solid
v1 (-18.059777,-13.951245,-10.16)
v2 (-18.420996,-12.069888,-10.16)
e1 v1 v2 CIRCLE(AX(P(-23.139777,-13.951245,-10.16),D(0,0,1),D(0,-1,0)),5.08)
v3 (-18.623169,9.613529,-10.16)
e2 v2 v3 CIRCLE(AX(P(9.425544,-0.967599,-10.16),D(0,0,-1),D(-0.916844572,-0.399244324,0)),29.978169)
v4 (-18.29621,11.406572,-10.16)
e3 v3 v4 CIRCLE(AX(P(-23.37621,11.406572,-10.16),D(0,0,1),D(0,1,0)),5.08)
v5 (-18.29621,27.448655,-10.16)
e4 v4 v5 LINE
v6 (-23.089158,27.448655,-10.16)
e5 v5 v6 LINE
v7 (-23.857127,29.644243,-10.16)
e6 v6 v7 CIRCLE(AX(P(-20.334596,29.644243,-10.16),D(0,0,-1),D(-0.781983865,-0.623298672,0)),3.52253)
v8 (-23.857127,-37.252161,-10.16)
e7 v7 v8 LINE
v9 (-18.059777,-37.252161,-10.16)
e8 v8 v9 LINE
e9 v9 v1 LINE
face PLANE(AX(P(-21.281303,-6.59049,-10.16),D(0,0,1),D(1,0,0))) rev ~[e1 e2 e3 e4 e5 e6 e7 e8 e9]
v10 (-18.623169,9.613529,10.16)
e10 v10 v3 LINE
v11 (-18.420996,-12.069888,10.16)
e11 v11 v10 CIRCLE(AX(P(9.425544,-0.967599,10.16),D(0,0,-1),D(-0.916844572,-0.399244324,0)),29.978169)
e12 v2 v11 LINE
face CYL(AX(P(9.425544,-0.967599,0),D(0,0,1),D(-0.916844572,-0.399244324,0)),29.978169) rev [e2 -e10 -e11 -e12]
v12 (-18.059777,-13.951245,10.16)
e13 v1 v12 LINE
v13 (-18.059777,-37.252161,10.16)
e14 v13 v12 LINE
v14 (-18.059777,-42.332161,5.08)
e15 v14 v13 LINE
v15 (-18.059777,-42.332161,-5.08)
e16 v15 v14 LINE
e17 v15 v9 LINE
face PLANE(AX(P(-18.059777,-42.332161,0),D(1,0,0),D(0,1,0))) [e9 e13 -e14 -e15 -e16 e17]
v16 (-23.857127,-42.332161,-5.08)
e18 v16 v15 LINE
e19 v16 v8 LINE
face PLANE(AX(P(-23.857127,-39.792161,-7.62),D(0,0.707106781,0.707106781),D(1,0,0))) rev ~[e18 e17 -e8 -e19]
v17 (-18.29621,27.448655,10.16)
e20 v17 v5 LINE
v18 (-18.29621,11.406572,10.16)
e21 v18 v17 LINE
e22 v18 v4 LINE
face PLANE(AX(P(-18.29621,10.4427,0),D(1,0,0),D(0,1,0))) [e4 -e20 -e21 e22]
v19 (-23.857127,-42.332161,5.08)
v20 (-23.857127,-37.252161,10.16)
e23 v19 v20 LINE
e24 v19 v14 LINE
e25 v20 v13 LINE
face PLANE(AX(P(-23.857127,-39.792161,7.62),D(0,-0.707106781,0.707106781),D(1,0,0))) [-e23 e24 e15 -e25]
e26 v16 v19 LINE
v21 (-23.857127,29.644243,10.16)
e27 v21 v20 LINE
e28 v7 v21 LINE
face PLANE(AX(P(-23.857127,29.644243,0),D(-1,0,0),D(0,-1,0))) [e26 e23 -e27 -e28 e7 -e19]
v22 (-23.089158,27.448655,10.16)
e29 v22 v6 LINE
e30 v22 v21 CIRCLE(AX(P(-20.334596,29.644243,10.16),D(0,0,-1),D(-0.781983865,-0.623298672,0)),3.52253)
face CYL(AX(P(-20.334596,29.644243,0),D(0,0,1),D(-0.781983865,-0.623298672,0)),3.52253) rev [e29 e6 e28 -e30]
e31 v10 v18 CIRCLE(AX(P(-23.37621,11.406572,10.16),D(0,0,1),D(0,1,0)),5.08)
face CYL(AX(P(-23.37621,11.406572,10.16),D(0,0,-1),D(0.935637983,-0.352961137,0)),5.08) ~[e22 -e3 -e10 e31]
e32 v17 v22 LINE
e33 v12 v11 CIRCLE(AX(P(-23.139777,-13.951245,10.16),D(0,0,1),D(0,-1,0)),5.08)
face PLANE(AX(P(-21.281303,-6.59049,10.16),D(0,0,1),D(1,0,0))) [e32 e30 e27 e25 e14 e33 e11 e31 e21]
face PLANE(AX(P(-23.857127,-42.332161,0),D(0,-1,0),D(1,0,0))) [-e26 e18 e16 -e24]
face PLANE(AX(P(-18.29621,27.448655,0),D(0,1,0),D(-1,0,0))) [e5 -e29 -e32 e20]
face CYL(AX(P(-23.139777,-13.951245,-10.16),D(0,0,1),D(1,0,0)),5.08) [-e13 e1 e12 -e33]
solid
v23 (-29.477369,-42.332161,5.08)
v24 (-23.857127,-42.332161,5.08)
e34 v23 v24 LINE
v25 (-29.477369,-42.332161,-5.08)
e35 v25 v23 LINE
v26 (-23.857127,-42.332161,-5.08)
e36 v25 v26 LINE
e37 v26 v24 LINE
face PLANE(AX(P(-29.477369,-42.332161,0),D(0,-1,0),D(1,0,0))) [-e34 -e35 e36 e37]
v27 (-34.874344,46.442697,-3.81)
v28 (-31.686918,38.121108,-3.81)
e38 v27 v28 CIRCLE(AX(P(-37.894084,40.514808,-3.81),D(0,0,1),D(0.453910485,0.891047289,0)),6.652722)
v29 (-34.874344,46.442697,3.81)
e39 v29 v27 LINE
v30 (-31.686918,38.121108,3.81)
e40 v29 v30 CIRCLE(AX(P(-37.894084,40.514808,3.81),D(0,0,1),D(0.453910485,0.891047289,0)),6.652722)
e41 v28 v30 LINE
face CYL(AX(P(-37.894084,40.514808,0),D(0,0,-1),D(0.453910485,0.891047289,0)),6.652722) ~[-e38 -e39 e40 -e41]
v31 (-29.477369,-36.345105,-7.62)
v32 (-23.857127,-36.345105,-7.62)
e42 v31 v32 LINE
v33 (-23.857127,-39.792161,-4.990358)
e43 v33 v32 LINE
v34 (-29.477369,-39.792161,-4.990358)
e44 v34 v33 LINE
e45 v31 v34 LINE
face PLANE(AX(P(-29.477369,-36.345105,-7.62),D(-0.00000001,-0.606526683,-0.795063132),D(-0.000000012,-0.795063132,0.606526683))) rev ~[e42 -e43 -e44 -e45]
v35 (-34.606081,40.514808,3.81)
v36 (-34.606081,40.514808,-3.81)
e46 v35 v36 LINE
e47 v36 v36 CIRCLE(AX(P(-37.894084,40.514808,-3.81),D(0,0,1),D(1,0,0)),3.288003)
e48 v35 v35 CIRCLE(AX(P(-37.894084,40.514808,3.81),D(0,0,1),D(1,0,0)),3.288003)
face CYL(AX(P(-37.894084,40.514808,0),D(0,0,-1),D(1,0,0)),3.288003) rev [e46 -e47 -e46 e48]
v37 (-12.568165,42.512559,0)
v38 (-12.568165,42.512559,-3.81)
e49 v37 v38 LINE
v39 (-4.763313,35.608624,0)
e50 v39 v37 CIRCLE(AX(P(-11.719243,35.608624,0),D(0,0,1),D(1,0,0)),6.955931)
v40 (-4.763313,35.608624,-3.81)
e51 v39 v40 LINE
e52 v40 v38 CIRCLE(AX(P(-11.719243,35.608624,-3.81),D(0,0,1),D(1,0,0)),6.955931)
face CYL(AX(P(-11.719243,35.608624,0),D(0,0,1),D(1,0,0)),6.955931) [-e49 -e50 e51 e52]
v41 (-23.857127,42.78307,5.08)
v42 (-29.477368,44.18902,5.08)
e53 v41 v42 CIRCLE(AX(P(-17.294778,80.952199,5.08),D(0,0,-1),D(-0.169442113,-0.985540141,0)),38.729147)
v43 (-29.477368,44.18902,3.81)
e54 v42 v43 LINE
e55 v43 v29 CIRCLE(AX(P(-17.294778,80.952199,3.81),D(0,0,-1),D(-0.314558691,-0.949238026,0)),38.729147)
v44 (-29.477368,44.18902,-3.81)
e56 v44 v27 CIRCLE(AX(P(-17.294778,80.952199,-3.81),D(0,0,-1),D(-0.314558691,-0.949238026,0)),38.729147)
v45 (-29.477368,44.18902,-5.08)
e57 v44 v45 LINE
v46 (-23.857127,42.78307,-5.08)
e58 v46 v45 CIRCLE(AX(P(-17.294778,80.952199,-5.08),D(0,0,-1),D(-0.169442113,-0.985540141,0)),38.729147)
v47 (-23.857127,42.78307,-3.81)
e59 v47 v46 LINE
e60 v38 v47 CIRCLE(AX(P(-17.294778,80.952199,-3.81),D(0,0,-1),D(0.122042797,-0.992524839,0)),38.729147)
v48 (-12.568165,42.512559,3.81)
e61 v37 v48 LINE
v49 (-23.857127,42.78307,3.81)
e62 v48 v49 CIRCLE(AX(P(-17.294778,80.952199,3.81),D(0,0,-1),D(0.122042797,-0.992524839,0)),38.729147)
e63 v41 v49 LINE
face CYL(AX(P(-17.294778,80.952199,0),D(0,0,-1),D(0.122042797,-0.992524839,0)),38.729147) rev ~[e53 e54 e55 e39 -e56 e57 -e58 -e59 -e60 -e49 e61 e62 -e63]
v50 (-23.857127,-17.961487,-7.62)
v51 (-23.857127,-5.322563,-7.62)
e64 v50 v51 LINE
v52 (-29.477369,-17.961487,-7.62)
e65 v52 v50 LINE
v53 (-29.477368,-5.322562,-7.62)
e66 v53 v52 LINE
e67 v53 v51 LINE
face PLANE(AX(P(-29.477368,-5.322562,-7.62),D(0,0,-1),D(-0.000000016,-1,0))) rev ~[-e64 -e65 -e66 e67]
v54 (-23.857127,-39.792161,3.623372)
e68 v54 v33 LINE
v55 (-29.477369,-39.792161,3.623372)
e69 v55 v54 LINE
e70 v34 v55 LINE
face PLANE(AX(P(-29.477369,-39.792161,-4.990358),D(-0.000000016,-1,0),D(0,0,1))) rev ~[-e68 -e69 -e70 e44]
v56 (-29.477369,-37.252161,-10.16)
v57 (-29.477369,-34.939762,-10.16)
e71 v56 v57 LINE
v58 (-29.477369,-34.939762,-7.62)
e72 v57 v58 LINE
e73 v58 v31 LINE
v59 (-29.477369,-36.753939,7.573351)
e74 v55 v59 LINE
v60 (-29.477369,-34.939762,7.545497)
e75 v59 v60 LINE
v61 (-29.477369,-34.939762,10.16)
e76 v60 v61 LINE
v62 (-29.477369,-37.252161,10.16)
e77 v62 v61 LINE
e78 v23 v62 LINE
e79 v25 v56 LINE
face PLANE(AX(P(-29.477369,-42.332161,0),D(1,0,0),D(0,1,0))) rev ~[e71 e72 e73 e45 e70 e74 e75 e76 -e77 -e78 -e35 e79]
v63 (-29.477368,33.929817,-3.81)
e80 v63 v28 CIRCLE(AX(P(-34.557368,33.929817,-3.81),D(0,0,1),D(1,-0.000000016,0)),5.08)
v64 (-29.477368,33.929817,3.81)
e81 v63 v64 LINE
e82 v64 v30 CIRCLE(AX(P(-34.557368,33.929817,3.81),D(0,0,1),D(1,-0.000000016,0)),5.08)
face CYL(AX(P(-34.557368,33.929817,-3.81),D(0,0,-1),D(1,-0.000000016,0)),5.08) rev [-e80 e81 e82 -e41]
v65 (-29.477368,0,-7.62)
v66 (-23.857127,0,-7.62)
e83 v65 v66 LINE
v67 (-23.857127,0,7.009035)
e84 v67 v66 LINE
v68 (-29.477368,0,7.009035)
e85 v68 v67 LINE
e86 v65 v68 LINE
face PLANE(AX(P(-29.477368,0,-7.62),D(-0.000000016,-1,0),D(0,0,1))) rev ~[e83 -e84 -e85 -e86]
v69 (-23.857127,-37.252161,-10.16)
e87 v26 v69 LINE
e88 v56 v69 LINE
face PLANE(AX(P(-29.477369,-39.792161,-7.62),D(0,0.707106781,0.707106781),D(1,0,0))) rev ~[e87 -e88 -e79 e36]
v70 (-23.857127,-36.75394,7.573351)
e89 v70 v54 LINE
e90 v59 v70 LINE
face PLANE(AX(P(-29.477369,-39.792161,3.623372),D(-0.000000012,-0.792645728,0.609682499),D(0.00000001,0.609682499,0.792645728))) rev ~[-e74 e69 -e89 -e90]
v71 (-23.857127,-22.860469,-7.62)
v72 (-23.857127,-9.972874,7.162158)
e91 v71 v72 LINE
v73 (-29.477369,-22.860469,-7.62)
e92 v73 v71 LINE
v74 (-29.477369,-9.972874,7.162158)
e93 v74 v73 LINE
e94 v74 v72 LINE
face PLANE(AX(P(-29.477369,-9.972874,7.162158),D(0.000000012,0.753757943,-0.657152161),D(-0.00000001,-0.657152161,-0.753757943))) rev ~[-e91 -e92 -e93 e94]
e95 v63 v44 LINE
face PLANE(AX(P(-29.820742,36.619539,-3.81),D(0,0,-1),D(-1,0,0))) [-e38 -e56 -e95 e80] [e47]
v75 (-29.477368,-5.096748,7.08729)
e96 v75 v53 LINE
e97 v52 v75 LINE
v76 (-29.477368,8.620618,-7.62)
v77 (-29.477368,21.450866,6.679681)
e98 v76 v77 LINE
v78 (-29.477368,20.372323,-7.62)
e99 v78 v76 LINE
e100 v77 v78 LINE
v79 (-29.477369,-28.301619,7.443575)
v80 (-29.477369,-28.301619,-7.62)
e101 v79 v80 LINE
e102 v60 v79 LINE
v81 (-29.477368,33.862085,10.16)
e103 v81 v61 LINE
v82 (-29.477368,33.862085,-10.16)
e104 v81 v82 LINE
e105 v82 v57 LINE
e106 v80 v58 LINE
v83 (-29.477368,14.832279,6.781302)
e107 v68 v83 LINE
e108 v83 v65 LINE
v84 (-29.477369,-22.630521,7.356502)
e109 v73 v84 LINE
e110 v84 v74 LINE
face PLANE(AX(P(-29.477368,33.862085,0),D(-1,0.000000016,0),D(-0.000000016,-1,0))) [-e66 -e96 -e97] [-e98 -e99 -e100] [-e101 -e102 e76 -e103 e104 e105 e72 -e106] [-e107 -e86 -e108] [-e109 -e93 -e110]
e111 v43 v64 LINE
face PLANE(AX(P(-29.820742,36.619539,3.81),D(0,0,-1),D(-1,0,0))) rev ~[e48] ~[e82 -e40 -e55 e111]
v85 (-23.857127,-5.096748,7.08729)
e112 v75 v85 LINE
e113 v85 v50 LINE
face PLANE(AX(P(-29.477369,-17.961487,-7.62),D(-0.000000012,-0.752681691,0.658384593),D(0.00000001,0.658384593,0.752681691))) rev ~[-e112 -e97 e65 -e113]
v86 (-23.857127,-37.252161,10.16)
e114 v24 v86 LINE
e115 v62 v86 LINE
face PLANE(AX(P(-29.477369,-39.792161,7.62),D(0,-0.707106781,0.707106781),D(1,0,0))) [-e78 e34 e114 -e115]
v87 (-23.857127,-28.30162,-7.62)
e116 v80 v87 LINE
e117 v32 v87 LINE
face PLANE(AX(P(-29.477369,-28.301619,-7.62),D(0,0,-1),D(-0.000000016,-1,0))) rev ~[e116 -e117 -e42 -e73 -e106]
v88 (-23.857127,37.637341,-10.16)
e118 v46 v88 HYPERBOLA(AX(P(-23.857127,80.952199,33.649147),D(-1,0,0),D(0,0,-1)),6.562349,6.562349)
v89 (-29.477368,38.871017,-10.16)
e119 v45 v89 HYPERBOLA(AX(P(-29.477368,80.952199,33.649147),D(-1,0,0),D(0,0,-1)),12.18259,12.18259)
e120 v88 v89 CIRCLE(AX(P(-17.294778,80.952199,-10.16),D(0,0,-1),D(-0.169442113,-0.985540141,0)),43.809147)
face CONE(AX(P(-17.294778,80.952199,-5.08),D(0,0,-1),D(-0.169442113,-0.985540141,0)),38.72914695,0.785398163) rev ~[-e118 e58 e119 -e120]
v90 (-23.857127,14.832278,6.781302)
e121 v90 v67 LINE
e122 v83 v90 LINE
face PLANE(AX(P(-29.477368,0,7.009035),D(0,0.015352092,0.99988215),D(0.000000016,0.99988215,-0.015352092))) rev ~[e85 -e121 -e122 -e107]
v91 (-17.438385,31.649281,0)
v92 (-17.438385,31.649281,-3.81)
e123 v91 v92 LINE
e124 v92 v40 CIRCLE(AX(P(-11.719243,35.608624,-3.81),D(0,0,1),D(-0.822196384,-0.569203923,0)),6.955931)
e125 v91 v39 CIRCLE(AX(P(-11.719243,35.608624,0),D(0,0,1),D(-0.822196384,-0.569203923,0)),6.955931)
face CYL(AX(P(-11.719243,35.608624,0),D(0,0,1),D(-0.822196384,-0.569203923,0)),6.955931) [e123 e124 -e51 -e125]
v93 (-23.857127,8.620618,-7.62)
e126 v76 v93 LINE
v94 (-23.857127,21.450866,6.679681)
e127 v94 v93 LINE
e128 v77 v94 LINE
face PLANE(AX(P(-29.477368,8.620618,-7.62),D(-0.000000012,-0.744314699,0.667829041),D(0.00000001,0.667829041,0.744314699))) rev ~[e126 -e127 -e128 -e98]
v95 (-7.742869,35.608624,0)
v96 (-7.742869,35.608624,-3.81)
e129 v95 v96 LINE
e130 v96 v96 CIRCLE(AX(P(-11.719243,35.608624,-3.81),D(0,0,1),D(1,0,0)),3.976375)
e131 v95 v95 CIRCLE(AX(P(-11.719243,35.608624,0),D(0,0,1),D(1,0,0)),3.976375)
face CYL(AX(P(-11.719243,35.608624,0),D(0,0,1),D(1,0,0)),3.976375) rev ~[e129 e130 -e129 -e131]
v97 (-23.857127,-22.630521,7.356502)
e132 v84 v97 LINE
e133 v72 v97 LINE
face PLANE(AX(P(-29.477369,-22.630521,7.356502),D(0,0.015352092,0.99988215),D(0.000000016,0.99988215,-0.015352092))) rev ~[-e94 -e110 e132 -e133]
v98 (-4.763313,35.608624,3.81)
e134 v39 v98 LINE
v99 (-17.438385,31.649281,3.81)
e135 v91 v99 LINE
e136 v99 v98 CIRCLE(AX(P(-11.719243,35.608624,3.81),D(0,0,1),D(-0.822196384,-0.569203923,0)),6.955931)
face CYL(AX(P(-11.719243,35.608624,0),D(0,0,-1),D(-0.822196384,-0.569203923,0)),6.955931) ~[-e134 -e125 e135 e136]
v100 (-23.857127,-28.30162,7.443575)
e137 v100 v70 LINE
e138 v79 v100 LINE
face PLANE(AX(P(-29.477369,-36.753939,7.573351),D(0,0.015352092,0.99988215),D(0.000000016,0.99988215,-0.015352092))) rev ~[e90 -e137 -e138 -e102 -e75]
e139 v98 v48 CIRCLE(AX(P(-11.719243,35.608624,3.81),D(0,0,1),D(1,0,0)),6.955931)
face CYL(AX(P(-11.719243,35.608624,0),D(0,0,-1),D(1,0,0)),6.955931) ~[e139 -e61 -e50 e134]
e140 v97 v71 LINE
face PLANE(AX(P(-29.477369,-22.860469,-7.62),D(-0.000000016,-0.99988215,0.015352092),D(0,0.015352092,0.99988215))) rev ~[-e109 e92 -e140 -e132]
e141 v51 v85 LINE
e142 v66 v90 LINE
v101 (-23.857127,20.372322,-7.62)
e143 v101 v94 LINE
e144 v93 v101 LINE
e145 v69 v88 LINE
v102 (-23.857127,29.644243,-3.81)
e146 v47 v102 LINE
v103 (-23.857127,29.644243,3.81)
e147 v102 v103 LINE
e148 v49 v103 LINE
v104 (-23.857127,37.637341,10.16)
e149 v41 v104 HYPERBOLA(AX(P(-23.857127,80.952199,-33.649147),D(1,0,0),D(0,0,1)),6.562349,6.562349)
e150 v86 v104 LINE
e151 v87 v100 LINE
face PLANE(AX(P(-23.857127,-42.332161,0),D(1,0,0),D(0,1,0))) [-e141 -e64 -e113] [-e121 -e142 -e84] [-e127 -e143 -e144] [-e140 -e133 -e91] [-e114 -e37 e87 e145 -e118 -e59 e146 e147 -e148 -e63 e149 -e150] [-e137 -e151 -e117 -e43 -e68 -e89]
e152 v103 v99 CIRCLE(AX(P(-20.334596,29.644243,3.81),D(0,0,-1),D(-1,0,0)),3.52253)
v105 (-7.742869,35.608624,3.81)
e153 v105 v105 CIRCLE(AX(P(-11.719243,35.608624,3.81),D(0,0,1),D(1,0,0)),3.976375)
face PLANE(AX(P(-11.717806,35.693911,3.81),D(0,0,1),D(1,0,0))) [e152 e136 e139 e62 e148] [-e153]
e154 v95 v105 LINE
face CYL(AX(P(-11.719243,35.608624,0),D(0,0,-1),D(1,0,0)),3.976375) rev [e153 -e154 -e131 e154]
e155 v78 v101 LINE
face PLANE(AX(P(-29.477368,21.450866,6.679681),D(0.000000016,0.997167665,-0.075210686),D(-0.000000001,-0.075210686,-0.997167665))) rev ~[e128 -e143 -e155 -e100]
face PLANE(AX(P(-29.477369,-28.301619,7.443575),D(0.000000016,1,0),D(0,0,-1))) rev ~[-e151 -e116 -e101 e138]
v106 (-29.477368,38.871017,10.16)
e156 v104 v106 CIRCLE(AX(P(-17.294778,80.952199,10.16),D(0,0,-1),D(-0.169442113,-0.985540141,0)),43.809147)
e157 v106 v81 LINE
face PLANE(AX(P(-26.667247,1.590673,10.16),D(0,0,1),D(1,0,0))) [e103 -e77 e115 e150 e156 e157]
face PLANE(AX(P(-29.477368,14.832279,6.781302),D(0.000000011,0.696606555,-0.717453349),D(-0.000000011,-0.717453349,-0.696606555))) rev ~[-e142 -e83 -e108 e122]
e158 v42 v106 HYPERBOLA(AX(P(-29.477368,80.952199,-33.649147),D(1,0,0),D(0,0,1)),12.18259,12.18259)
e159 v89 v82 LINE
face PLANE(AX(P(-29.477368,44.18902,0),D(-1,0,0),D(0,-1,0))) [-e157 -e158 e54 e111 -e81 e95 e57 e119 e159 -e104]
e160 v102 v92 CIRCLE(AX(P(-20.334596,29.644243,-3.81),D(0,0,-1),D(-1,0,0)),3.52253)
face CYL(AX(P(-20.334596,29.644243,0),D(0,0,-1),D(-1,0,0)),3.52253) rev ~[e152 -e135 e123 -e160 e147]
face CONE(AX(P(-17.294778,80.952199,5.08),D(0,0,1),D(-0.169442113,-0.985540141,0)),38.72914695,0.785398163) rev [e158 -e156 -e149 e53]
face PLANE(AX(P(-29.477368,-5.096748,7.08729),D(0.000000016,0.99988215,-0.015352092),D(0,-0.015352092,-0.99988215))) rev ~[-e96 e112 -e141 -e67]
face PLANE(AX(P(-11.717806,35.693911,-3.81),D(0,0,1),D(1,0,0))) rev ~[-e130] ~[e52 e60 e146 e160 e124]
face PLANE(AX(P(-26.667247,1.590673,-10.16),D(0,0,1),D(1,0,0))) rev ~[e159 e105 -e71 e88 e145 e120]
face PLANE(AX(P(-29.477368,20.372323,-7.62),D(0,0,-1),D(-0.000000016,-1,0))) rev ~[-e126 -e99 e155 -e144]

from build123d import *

# Parameters (mm, degrees)
F0_W        = 5.6202424753
F0_H        = 7.3923990308
F1_DEPTH    = 10.16
F0_R        = 3.2880029728
F0_R_2      = 3.9763748147
F2_DEPTH    = 3.81
F3_SIZE     = 5.08
F4_DEPTH    = 10.16
F5_SIZE     = 5.08
F6_T1_DEPTH = 7.62
F6_2_F1_R   = 5.08
F6_2_F2_R   = 5.08
F8_DEPTH    = 12.7


# Not quite as in the source:
# - a fillet or chamfer that OpenCascade refuses, or shapes differently, is made with other operations: its cross-section is extruded or revolved along the edge and cut away or added


with BuildPart() as f1:
    # F0 (on Top) → F1 (new body, symmetric)
    with BuildSketch(Plane.XY):
        Polygon((-23.8571265649, 38.1211079657), (-29.4773678438, 38.1211079657), (-29.4773678438, 33.8620854561), (-29.4773689242, -34.9397621871), (-23.8571265649, -34.9397622754), (-23.8571265649, 29.6442432214), align=None)
        with BuildLine():
            ThreePointArc((-23.8571265649, 42.7830699379), (-26.6935732854, 43.3808072311), (-29.4773678438, 44.1890199055))
            Line((-29.4773678438, 44.1890199055), (-29.4773678438, 38.1211079657))
            Line((-29.4773678438, 38.1211079657), (-23.8571265649, 38.1211079657))
            Line((-23.8571265649, 38.1211079657), (-23.8571265649, 42.7830699379))
        make_face()
        with Locations((-26.6672478026, -38.6359617025)):
            Rectangle(F0_W, F0_H)
    extrude(amount=F1_DEPTH, both=True)

    # F0 (on Top) → F2 (join, symmetric)
    with BuildSketch(Plane.XY):
        with BuildLine():
            ThreePointArc((-31.6869179481, 38.1211079657), (-31.3536995737, 39.297400699), (-31.2413621678, 40.5148075278))
            ThreePointArc((-31.2413621678, 40.5148075278), (-32.2218622797, 43.9910999495), (-34.8743439371, 46.4426974955))
            ThreePointArc((-34.8743439371, 46.4426974955), (-44.1066653776, 38.1351969368), (-31.6869179481, 38.1211079657))
        make_face()
        with Locations((-37.8940842395, 40.5148075278)):
            Circle(F0_R, mode=Mode.SUBTRACT)
        with BuildLine():
            ThreePointArc((-4.763312552, 35.6086244195), (-7.1105593997, 40.8187113422), (-12.5681646531, 42.5125585623))
            ThreePointArc((-12.5681646531, 42.5125585623), (-18.0664915689, 38.4542200705), (-17.4383845866, 31.6492812901))
            ThreePointArc((-17.4383845866, 31.6492812901), (-9.6452347995, 28.9690866137), (-4.763312552, 35.6086244195))
        make_face()
        with Locations((-11.7192433987, 35.6086244195)):
            Circle(F0_R_2, mode=Mode.SUBTRACT)
        with BuildLine():
            ThreePointArc((-12.5681646531, 42.5125585623), (-18.2225576344, 42.2341662967), (-23.8571265649, 42.7830699379))
            Line((-23.8571265649, 42.7830699379), (-23.8571265649, 38.1211079657))
            Line((-23.8571265649, 38.1211079657), (-23.8571265649, 29.6442432214))
            ThreePointArc((-23.8571265649, 29.6442432214), (-21.3848882076, 33.0065499535), (-17.4383845866, 31.6492812901))
            ThreePointArc((-17.4383845866, 31.6492812901), (-18.0664915689, 38.4542200705), (-12.5681646531, 42.5125585623))
        make_face()
        with BuildLine():
            ThreePointArc((-34.8743439371, 46.4426974955), (-32.2218622797, 43.9910999495), (-31.2413621678, 40.5148075278))
            ThreePointArc((-31.2413621678, 40.5148075278), (-31.3536995737, 39.297400699), (-31.6869179481, 38.1211079657))
            Line((-31.6869179481, 38.1211079657), (-29.4773678438, 38.1211079657))
            Line((-29.4773678438, 38.1211079657), (-29.4773678438, 44.1890199055))
            ThreePointArc((-29.4773678438, 44.1890199055), (-32.2184586739, 45.213836031), (-34.8743439371, 46.4426974955))
        make_face()
    extrude(amount=F2_DEPTH, both=True)

    # F3
    f3_edges = [f1.edges().sort_by_distance(p)[0] for p in [
        (-26.693573, 43.380807, 10.16),
        (-26.693573, 43.380807, -10.16),
        (-26.667248, -42.332161, 10.16),
        (-26.667248, -42.332161, -10.16),
    ]]
    chamfer(f3_edges, length=F3_SIZE)

    # F6: fillet of radius 5.08 on 4 edges, made by hand

    # F6_s2 → F6_t1 (join)
    with BuildSketch(Plane.XY.offset(-3.81)):
        with BuildLine():
            ThreePointArc((-29.4773678427, 33.9298172252), (-30.063578473, 36.2988375878), (-31.6869179481, 38.1211079657))
            Line((-31.6869179481, 38.1211079657), (-31.3998729586, 38.5402370318))
            ThreePointArc((-31.3998729586, 38.5402370318), (-30.5821428959, 38.6291079657), (-29.4773678438, 38.6291079657))
            Line((-29.4773678438, 38.6291079657), (-28.9693678438, 38.1211079657))
            Line((-28.9693678438, 38.1211079657), (-28.9693678427, 33.9298172173))
            Line((-28.9693678427, 33.9298172173), (-29.4773678427, 33.9298172252))
        make_face()
    extrude(amount=F6_T1_DEPTH)

    # F7 (on face) → F8 (cut)
    with BuildSketch(Plane(origin=(-29.4773683755, 4.629e-07, 0), x_dir=(-1.57e-08, -1, 0), z_dir=(-1, 1.57e-08, 0))):
        Polygon((36.3451056182, -7.62), (39.7921616808, -4.9903579056), (39.7921616808, 3.623371711), (36.7539399008, 7.5733514423), (28.3016198795, 7.443575354), (28.3016198795, -7.62), align=None)
        Polygon((9.9728746732, 7.1621576072), (22.8604692966, -7.62), (22.6305215634, 7.3565018696), align=None)
        Polygon((17.961487174, -7.62), (5.0967486238, 7.0872900485), (5.3225629052, -7.62), align=None)
        Polygon((0, -7.62), (0, 7.0090350727), (-14.8322781086, 6.7813017369), align=None)
        Polygon((-21.4508656455, 6.6796805964), (-20.3723220551, -7.62), (-8.6206179077, -7.62), align=None)
    extrude(amount=-F8_DEPTH, mode=Mode.SUBTRACT)


with BuildPart() as f4:
    # F0 (on Top) → F4 (new body, symmetric)
    with BuildSketch(Plane.XY):
        with BuildLine():
            ThreePointArc((-23.0891581237, 27.4486547619), (-23.6595960638, 28.481231591), (-23.8571265649, 29.6442432214))
            Line((-23.8571265649, 29.6442432214), (-23.8571265649, -34.9397622754))
            Line((-23.8571265649, -34.9397622754), (-23.8571265649, -42.3321612179))
            Line((-23.8571265649, -42.3321612179), (-18.0597770959, -42.3321612179))
            Line((-18.0597770959, -42.3321612179), (-18.0597770959, -12.9362130538))
            ThreePointArc((-18.0597770959, -12.9362130538), (-20.5510916383, -1.2707557569), (-18.2962100953, 10.442700237))
            Line((-18.2962100953, 10.442700237), (-18.2962100953, 27.4486547619))
            Line((-18.2962100953, 27.4486547619), (-23.0891581237, 27.4486547619))
        make_face()
    extrude(amount=F4_DEPTH, both=True)

    # F5
    f5_edges = [f4.edges().sort_by_distance(p)[0] for p in [
        (-20.958452, -42.332161, 10.16),
        (-20.958452, -42.332161, -10.16),
    ]]
    chamfer(f5_edges, length=F5_SIZE)

    # F6#2: fillet of radius 5.08 on 2 edges, made by hand

    # F6_2_f1
    f6_2_f1_edges = [f4.edges().sort_by_distance(p)[0] for p in [
        (-18.0597770959, -12.9362130538, 0),
    ]]
    fillet(f6_2_f1_edges, radius=F6_2_F1_R)

    # F6_2_f2
    f6_2_f2_edges = [f4.edges().sort_by_distance(p)[0] for p in [
        (-18.2962100953, 10.442700237, 0),
    ]]
    fillet(f6_2_f2_edges, radius=F6_2_F2_R)


solid = Compound([f1.part, f4.part])
